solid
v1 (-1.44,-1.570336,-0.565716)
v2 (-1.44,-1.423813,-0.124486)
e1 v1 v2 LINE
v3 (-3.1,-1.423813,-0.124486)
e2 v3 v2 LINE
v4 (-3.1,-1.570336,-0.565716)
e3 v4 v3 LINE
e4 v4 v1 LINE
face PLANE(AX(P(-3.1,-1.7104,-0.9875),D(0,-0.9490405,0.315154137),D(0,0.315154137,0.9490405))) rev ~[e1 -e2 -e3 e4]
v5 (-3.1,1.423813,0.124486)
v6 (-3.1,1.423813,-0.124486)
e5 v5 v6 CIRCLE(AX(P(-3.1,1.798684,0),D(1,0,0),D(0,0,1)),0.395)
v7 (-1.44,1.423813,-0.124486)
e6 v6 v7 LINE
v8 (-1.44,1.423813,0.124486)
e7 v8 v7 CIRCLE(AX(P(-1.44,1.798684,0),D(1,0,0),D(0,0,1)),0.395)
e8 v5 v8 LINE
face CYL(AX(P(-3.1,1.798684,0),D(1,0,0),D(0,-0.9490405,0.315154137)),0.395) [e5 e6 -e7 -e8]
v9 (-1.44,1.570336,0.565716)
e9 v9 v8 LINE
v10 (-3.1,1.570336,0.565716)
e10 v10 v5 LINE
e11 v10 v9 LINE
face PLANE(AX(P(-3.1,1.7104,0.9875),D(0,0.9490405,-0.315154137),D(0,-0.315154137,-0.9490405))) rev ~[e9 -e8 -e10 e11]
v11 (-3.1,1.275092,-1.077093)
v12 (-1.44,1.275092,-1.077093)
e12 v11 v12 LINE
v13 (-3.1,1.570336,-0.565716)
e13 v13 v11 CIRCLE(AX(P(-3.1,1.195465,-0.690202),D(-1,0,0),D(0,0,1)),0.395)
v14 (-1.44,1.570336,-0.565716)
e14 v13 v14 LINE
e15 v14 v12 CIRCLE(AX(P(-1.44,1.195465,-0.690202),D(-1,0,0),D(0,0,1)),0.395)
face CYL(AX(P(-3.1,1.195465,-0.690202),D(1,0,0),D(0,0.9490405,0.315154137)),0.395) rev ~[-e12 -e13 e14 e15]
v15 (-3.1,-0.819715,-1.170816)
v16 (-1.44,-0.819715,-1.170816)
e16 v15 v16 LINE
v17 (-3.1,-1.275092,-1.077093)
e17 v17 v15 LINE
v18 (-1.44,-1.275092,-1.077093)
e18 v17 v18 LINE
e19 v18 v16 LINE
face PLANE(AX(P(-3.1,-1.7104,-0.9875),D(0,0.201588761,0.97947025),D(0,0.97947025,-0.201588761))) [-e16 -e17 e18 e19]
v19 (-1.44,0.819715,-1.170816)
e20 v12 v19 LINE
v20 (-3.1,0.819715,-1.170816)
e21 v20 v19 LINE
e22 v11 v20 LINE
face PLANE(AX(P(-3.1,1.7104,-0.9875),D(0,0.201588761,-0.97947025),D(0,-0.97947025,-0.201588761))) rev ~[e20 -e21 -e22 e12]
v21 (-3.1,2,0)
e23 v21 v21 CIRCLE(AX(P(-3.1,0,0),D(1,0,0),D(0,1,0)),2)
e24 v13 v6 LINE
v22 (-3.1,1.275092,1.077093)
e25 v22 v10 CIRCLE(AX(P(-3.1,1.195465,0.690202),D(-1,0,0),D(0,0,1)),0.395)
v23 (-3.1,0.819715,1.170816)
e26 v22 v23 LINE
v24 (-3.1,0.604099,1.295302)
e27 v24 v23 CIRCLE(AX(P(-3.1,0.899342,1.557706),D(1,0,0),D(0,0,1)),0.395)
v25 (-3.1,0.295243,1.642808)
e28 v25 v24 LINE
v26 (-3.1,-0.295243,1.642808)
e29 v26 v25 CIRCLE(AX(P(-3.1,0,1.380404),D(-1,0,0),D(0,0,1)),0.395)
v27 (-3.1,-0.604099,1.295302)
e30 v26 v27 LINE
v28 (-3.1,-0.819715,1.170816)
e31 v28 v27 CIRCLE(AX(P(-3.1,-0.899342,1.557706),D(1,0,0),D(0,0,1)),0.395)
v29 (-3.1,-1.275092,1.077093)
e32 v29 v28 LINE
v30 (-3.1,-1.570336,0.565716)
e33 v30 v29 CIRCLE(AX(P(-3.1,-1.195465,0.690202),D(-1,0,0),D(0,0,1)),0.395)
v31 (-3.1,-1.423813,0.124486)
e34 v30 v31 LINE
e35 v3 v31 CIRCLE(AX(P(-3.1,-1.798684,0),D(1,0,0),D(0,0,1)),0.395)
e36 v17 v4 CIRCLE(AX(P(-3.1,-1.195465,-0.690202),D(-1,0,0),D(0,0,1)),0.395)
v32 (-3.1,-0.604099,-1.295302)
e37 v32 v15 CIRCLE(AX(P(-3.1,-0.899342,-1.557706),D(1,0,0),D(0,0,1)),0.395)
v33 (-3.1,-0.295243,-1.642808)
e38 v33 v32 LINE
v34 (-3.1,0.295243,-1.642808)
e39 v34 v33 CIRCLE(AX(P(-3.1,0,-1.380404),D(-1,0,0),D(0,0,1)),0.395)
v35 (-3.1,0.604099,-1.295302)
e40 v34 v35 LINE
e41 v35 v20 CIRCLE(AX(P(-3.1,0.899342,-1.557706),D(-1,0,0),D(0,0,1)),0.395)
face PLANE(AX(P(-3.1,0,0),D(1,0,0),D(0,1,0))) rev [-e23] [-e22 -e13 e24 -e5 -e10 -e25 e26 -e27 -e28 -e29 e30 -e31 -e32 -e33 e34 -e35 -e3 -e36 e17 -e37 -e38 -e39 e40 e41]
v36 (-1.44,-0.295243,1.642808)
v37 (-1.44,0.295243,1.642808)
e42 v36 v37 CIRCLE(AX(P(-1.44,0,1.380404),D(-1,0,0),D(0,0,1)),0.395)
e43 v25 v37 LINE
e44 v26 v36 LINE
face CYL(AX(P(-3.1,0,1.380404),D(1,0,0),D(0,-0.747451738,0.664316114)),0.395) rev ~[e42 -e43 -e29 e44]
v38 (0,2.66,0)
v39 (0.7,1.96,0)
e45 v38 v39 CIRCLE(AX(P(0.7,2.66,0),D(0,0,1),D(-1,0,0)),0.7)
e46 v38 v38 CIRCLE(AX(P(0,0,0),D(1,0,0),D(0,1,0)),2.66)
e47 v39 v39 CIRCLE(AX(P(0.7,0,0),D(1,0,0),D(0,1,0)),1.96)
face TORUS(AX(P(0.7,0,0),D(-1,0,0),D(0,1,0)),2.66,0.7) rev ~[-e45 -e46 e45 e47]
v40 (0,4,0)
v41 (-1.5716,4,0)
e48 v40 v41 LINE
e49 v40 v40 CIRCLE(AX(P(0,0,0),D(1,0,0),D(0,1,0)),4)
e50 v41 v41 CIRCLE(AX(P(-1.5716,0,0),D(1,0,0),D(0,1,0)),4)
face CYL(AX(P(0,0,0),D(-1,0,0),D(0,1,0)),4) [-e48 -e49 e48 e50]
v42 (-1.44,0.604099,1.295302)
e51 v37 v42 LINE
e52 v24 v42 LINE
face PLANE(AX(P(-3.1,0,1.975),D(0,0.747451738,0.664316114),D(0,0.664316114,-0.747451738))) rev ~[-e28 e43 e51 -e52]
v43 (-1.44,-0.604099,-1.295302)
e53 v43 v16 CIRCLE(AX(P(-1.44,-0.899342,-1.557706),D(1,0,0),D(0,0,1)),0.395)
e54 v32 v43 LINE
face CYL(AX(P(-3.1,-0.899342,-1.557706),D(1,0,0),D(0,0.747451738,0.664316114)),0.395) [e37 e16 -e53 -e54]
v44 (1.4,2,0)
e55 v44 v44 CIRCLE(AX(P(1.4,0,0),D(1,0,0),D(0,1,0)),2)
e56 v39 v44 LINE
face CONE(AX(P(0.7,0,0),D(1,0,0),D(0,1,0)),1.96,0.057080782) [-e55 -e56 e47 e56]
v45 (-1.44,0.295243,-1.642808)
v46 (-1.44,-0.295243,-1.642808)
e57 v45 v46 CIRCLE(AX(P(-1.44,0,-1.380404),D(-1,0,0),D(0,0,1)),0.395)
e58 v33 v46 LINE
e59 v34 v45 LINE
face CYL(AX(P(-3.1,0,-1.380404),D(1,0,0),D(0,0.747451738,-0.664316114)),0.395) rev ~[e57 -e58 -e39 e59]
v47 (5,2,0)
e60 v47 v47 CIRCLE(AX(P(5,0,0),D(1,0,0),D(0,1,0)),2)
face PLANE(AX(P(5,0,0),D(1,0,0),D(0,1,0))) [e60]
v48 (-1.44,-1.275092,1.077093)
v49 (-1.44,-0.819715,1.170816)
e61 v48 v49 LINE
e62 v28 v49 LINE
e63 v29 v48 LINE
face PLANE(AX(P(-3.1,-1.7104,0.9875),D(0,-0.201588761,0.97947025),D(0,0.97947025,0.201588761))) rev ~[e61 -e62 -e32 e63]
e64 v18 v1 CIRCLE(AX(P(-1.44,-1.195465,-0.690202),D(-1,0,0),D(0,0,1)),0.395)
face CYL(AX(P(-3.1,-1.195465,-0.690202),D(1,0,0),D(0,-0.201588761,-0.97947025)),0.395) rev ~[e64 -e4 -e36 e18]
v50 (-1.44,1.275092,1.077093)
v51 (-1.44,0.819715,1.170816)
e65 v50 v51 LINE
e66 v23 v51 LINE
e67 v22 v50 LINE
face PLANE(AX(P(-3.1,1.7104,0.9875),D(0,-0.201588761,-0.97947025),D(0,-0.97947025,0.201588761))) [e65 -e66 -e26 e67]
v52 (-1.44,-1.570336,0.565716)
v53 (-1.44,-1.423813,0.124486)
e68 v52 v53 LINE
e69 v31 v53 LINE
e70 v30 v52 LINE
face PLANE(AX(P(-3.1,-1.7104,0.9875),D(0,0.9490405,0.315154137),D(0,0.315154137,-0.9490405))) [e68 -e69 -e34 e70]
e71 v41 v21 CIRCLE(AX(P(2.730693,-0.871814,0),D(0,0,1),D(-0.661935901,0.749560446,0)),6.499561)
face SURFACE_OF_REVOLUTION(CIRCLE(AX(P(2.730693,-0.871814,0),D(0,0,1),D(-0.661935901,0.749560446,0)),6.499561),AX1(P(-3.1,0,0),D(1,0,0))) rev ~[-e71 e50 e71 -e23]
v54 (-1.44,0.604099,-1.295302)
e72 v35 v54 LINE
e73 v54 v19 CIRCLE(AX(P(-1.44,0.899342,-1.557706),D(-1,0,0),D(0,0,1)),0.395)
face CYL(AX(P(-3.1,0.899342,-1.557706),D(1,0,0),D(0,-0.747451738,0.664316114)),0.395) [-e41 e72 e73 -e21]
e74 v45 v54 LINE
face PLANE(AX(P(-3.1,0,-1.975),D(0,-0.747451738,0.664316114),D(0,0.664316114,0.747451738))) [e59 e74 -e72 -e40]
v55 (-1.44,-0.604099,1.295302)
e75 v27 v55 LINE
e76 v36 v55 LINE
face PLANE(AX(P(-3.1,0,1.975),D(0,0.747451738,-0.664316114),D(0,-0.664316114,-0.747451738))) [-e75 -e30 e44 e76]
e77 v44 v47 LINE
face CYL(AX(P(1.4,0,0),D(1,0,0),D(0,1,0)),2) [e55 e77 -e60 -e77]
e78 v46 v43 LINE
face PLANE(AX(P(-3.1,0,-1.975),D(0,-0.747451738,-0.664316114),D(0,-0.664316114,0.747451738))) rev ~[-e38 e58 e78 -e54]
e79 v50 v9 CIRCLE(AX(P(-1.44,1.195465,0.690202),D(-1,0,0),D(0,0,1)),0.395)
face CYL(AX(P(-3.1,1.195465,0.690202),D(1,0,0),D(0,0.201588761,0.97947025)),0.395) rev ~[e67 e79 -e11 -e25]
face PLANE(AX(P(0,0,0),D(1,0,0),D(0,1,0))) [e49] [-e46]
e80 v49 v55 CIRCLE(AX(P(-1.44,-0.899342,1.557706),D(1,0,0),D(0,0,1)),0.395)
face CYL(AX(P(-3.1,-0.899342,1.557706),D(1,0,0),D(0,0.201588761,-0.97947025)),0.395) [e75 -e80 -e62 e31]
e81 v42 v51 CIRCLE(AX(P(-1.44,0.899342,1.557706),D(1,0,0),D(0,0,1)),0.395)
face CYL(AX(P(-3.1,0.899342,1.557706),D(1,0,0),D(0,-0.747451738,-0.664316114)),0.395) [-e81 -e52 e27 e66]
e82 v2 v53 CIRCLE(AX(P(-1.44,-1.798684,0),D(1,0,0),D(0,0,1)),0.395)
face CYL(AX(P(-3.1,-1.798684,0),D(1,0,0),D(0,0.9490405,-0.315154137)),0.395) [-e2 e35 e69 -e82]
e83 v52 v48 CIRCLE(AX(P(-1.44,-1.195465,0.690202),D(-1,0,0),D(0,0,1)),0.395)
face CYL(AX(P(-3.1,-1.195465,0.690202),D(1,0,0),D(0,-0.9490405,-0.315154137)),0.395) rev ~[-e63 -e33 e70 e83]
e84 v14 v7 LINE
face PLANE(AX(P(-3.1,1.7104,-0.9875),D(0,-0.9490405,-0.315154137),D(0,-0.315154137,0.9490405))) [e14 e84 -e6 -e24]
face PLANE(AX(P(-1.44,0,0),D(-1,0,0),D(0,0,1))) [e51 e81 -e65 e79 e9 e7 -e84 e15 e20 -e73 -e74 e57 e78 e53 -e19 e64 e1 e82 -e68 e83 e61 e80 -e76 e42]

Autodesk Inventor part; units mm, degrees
ref_plane "YZ Plane" through (0, 0, 0) normal (1, 0, 0) x (0, 1, 0)
ref_plane "XZ Plane" through (0, 0, 0) normal (0, 1, 0) x (-1, 0, 0)
ref_plane "XY Plane" through (0, 0, 0) normal (0, 0, 1) x (1, 0, 0)
sketch "Sketch4" plane through (0, 0, 0) normal (0, 0, 1) x (1, 0, 0)
  line L0 (-3.1, 0) -> (5, 0)
  line L1 (0, 0) -> (-3.1, 0)
  line L2 (0, 4) -> (0, 2.66)
  line L3 (0.7, 1.96) -> (0.7, 1.96)
  line L4 (0.7, 1.96) -> (1.4, 2)
  arc A0 (0, 2.66) -> (0.7, 1.96) centre (0.7, 2.66) ccw
  line L5 (-3.1, 0) -> (-3.1, 2)
  line L6 (0, 4) -> (-1.5716, 4)
  arc A1 (-1.5716, 4) -> (-3.1, 2) centre (2.731, -0.8721) ccw
  line L7 (1.4, 2) -> (5, 2)
  line L8 (5, 2) -> (5, 0)
  point P0 (0, 1.96)
  dimension "d71" = 0.7
  dimension "d72" = 5
  dimension "d74" = 0.7
  dimension "d75" = 3.92
  dimension "d78" = 4
  dimension "d82" = 6.5
  dimension "d83" = 3.1
  dimension "d84" = 8
  dimension "d104" = 3.6
  dimension "d105" = 4
revolve "Revolution7" add sketch "Sketch4" angle 360 about axis through (-3.1, 0, 0) along (1, 0, 0)
sketch "Sketch5" plane through (-3.1, 0, 0) normal (-1, 0, 0) x (0, 0, 1)
  circle A0 centre (0, 0) radius 1.975 construction
  circle A1 centre (0, 0) radius 1.3825 construction
  line L0 (0, 0) -> (-1.1973, 0.6912)
  line L1 (0, 0) -> (-1.1973, -0.6912)
  line L2 (-1.8008, 0) -> (1.7887, 0)
  line L3 (-1.975, 0) -> (-1.1973, -0.6912)
  line L4 (-1.975, 0) -> (-1.1973, 0.6912)
  point P0 (0, 0)
  dimension "d88" = 3.95
  dimension "d89" = 2.765
  dimension "d90" = 30
  dimension "d91" = 30
extrude "Extrusion1" cut sketch "Sketch5" against normal blind 1.66
pattern_circular "Circular Pattern1" count 6 over 360 about axis through (-10, 0, 0) along (1, 0, 0) of "Extrusion1"
fillet "Fillet1" radius 0.395 12 edges at (-2.27, -1.7104, -0.9875) (-2.27, -0.6912, -1.1973) (-2.27, -1.3825, 0) (-2.27, -1.7104, 0.9875) (-2.27, -0.6912, 1.1973) (-2.27, 0, 1.975) (-2.27, 1.3825, 0) (-2.27, 1.7104, 0.9875) (-2.27, 0.6913, 1.1973) (-2.27, 0.6912, -1.1973) (-2.27, 0, -1.975) (-2.27, 1.7104, -0.9875)
thread "Thread7" size "M4x0.7" class "6g" standard "ISO Metric profile" length 3.6
equation "\"a\" = 1.4"
equation "\"b\" = 3.6"
equation "\"dk\" = 8"
equation "\"k\" = 3.1"
equation "\"r\" = 0.7"
equation "\"rf\" = 6.5"
equation "\"x\" = 0.7"
equation "\"A_\" = 3.95"
equation "\"t\" = 1.66"
equation "\"p\" = 0.7"
equation "\"l_\" = 5"
equation "\"d\" = 4"
equation "\"ds_\" = 3.92"
equation "\"lg\" = 0"
properties part number "Flachkopfschraube mit Innenrund ISO 14583 - M4 x 5 - A2-70" material "Edelstahl"
